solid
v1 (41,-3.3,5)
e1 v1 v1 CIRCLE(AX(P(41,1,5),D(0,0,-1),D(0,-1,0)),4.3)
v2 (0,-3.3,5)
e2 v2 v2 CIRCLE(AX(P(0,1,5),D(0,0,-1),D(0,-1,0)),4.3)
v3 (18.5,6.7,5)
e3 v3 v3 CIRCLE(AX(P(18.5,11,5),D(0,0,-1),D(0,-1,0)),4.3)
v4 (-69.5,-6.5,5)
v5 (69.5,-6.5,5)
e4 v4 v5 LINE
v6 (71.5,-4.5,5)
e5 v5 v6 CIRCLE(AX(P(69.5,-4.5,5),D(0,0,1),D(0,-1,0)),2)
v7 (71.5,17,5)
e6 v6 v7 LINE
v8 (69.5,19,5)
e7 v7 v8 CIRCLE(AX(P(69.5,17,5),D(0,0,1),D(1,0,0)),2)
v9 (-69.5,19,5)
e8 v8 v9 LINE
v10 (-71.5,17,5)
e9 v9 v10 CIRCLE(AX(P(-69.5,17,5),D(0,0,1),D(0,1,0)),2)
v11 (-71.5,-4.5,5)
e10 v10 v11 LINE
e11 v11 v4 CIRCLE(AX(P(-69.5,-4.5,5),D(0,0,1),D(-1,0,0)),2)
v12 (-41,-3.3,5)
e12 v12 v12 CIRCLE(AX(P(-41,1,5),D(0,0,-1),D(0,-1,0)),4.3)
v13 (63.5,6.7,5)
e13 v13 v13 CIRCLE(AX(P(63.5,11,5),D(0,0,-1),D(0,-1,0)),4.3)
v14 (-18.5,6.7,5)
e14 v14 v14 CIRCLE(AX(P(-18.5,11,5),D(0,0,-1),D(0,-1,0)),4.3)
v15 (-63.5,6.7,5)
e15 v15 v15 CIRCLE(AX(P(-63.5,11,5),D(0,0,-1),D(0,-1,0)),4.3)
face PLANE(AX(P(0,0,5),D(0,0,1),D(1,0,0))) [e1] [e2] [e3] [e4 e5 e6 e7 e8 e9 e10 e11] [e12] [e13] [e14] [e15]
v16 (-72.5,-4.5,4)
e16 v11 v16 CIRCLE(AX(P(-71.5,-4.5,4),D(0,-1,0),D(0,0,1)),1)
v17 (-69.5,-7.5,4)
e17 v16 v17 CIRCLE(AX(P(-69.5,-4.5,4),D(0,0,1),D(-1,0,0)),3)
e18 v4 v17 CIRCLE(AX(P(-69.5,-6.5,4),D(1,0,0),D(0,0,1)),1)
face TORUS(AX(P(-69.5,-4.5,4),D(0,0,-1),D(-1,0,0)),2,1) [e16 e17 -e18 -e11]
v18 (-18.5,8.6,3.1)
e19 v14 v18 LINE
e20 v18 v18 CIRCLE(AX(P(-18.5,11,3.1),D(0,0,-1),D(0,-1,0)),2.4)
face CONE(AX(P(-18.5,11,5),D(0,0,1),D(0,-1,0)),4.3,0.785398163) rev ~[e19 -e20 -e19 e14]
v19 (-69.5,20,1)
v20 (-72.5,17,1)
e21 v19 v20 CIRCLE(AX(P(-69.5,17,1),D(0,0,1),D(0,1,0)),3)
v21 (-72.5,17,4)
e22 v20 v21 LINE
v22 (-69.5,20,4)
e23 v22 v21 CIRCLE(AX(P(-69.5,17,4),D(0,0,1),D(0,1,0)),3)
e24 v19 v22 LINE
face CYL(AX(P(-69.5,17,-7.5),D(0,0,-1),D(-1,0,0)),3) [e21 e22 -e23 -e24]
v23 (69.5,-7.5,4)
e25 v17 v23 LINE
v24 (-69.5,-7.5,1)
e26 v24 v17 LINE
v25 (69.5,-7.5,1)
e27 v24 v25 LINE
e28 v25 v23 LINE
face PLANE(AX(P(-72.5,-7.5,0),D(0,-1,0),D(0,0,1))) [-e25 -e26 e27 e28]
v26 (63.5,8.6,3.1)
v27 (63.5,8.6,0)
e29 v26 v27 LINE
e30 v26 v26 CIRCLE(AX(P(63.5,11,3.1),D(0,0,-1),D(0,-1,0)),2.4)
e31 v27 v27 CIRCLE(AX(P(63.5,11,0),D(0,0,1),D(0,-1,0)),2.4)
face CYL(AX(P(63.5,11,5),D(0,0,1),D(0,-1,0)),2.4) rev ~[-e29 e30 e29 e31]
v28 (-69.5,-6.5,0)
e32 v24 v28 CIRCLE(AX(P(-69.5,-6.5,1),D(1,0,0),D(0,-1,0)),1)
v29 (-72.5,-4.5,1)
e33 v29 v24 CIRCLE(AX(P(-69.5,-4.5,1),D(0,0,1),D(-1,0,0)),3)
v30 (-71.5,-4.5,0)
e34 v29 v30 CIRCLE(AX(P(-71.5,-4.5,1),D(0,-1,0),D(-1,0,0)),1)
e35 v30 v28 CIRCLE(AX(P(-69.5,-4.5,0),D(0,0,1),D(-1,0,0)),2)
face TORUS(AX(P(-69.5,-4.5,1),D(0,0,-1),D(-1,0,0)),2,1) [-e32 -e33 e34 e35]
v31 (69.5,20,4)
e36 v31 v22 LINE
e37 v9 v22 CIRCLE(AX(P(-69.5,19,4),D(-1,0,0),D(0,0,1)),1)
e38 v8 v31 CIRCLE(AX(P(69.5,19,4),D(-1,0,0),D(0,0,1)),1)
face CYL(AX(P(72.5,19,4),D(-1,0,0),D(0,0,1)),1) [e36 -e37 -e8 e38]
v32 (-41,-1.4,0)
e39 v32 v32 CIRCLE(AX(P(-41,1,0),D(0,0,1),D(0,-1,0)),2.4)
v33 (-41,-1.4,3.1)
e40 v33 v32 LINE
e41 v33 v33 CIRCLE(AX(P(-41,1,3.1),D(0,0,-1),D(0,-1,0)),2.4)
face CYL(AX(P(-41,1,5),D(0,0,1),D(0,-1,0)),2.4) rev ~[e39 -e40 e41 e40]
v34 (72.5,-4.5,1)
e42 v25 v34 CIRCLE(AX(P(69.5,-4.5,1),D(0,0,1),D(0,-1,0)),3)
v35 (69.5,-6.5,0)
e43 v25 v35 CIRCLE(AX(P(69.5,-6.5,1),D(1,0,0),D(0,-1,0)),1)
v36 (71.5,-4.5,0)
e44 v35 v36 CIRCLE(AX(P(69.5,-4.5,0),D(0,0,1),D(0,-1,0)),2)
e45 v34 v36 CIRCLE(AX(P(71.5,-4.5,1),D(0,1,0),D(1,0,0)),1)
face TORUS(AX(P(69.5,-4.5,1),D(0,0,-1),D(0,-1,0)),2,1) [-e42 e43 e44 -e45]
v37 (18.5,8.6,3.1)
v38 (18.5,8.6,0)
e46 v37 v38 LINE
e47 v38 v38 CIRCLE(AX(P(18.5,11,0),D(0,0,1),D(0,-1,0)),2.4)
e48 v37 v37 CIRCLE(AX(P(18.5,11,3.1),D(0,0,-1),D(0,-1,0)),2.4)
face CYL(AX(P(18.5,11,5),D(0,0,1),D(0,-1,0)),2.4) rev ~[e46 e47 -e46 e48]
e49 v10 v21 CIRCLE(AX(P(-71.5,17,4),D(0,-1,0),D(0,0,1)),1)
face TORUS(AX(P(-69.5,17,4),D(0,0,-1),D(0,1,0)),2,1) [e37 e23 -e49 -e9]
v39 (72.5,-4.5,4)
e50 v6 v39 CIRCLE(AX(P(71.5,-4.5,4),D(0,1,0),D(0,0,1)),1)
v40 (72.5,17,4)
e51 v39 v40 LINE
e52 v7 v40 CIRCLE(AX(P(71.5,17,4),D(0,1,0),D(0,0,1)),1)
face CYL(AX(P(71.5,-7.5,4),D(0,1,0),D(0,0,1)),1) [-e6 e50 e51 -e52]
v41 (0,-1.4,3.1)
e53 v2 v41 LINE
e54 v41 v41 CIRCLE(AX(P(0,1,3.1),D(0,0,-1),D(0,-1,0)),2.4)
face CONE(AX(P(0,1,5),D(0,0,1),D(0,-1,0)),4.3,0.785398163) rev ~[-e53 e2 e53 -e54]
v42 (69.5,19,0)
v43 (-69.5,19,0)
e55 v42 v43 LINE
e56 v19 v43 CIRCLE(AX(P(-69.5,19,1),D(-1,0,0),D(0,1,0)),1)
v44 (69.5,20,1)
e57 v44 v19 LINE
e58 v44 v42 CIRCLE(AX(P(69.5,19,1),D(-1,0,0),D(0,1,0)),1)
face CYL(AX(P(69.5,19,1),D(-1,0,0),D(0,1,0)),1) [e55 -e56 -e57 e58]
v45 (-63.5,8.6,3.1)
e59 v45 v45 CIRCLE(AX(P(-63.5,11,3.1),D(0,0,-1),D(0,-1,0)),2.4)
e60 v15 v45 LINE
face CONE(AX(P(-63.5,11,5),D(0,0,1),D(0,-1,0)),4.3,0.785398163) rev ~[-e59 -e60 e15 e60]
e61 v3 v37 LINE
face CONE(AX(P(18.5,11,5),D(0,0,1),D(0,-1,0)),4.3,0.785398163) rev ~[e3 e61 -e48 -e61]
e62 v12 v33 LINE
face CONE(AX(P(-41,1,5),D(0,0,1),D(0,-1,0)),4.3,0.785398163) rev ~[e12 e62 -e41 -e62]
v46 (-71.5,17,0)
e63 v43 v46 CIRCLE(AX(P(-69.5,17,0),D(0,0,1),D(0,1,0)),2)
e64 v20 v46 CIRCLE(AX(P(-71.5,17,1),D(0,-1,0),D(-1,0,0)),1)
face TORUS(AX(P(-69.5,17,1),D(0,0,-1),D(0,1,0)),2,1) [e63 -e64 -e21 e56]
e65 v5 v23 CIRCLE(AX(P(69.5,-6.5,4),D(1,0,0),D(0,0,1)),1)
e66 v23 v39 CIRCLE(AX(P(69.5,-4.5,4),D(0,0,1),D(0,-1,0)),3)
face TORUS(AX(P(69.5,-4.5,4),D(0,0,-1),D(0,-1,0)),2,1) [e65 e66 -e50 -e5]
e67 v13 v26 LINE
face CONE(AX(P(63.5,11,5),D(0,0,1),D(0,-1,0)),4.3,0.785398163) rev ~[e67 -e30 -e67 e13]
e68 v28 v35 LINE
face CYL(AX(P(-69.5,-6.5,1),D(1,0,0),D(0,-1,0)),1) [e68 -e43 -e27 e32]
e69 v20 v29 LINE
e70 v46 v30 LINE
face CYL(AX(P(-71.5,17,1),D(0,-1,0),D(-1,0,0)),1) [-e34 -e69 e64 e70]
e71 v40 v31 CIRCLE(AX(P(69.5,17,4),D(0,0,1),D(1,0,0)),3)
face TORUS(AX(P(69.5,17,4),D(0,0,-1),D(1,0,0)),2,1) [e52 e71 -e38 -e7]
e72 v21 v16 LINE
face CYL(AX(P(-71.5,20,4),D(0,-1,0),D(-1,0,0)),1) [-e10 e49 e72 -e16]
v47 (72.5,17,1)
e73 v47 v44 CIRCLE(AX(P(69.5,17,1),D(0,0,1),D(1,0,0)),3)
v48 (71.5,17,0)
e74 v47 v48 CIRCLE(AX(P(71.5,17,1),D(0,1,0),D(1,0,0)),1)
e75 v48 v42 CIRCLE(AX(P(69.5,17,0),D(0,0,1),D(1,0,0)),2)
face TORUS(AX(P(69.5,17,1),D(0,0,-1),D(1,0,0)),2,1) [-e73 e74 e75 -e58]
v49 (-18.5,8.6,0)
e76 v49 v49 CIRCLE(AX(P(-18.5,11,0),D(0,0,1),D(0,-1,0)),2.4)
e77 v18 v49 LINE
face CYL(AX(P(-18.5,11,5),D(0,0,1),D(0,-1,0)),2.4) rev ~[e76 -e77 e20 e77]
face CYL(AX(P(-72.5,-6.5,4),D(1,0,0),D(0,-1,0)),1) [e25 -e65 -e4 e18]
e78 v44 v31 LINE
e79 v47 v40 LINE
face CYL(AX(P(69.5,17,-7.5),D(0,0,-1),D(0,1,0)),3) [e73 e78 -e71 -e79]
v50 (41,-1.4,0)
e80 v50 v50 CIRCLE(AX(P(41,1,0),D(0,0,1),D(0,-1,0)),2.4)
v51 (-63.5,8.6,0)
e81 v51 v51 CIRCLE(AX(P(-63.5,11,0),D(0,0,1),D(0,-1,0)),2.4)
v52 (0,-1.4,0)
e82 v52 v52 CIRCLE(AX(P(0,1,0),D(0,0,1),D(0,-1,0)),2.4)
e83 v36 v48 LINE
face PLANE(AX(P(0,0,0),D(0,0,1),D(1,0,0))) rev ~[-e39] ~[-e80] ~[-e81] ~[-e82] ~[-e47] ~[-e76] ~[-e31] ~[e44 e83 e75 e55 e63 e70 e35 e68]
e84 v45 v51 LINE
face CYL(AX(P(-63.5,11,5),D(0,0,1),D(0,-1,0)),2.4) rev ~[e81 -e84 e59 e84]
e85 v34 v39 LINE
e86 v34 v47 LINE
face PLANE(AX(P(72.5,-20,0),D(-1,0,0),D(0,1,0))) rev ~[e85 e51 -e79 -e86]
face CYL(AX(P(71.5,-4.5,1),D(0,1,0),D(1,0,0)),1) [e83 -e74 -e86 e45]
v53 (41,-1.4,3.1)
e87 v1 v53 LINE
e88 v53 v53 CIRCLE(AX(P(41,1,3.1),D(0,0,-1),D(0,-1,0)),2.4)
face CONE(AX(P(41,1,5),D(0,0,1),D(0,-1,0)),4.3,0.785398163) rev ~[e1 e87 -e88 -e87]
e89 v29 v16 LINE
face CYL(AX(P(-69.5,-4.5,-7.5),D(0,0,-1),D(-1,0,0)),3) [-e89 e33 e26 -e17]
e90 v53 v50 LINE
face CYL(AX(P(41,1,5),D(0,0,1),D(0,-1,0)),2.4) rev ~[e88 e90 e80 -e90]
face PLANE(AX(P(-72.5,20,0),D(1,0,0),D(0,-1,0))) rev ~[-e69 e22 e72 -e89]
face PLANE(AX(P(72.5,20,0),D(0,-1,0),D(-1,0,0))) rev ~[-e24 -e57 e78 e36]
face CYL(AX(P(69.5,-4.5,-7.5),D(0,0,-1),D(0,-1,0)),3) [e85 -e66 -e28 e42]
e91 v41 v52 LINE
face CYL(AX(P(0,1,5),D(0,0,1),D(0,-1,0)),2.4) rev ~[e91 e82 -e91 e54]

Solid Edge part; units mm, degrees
sketch "Sketch1" plane through (0, 0, 0) normal (0, 0, 1) x (1, 0, 0)
  line L0 (-72.5, -20) -> (72.5, -20)
  line L1 (72.5, -20) -> (72.5, 20)
  line L2 (72.5, 20) -> (-72.5, 20)
  line L3 (-72.5, 20) -> (-72.5, -20)
extrude "Protrusion1" add sketch "Sketch1" along normal blind 5
hole "Bohrung_1" at (-63.5, 11, 5) direction (0, 0, -1) diameter 4.8 end up to next countersink diameter 8.6 countersink angle 90
hole "Hole1" at (-18.5, 11, 5) direction (0, 0, -1) diameter 4.8 end up to next countersink diameter 8.6 countersink angle 90
hole "Hole2" at (18.5, 11, 5) direction (0, 0, -1) diameter 4.8 end up to next countersink diameter 8.6 countersink angle 90
hole "Hole3" at (63.5, 11, 5) direction (0, 0, -1) diameter 4.8 end up to next countersink diameter 8.6 countersink angle 90
hole "Hole4" at (41, 1, 5) direction (0, 0, -1) diameter 4.8 end up to next countersink diameter 8.6 countersink angle 90
hole "Hole5" at (0, 1, 5) direction (0, 0, -1) diameter 4.8 end up to next countersink diameter 8.6 countersink angle 90
hole "Hole6" at (-41, 1, 5) direction (0, 0, -1) diameter 4.8 end up to next countersink diameter 8.6 countersink angle 90
sketch "Sketch2" plane through (-72.5, 0, 2.5) normal (-1, 0, 0) x (0, 1, 0)
  line L0 (-7.5, 2.5) -> (-7.5, -2.5)
  line L1 (-7.5, -2.5) -> (-21.6634, -3.36)
  line L2 (-21.6634, -3.36) -> (-22.4966, 5.1713)
  line L3 (-22.4966, 5.1713) -> (-7.5, 2.5)
  dimension "D1" = 12.5
extrude "Extrusionsausschnitt_1" cut sketch "Sketch2" against normal blind 163.0686
fillet "Verrundung_1" radius 1 4 edges at (-72.5, 6.25, 5) (0, 20, 5) (72.5, 6.25, 5) (0, -7.5, 5)
fillet "Verrundung_2" radius 3 8 edges at (-72.5, 20, 2) (-72.2071, 19.7071, 4.7071) (-72.2071, -7.2071, 4.7071) (-72.5, -7.5, 2) (72.5, 20, 2) (72.2071, 19.7071, 4.7071) (72.5, -7.5, 2) (72.2071, -7.2071, 4.7071)
fillet "Verrundung_3" radius 1 7 edges at (-72.5, 6.25, 0) (-71.6213, -6.6213, 0) (0, -7.5, 0) (71.6213, -6.6213, 0) (72.5, 6.25, 0) (0, 20, 0) (-71.6213, 19.1213, 0)
